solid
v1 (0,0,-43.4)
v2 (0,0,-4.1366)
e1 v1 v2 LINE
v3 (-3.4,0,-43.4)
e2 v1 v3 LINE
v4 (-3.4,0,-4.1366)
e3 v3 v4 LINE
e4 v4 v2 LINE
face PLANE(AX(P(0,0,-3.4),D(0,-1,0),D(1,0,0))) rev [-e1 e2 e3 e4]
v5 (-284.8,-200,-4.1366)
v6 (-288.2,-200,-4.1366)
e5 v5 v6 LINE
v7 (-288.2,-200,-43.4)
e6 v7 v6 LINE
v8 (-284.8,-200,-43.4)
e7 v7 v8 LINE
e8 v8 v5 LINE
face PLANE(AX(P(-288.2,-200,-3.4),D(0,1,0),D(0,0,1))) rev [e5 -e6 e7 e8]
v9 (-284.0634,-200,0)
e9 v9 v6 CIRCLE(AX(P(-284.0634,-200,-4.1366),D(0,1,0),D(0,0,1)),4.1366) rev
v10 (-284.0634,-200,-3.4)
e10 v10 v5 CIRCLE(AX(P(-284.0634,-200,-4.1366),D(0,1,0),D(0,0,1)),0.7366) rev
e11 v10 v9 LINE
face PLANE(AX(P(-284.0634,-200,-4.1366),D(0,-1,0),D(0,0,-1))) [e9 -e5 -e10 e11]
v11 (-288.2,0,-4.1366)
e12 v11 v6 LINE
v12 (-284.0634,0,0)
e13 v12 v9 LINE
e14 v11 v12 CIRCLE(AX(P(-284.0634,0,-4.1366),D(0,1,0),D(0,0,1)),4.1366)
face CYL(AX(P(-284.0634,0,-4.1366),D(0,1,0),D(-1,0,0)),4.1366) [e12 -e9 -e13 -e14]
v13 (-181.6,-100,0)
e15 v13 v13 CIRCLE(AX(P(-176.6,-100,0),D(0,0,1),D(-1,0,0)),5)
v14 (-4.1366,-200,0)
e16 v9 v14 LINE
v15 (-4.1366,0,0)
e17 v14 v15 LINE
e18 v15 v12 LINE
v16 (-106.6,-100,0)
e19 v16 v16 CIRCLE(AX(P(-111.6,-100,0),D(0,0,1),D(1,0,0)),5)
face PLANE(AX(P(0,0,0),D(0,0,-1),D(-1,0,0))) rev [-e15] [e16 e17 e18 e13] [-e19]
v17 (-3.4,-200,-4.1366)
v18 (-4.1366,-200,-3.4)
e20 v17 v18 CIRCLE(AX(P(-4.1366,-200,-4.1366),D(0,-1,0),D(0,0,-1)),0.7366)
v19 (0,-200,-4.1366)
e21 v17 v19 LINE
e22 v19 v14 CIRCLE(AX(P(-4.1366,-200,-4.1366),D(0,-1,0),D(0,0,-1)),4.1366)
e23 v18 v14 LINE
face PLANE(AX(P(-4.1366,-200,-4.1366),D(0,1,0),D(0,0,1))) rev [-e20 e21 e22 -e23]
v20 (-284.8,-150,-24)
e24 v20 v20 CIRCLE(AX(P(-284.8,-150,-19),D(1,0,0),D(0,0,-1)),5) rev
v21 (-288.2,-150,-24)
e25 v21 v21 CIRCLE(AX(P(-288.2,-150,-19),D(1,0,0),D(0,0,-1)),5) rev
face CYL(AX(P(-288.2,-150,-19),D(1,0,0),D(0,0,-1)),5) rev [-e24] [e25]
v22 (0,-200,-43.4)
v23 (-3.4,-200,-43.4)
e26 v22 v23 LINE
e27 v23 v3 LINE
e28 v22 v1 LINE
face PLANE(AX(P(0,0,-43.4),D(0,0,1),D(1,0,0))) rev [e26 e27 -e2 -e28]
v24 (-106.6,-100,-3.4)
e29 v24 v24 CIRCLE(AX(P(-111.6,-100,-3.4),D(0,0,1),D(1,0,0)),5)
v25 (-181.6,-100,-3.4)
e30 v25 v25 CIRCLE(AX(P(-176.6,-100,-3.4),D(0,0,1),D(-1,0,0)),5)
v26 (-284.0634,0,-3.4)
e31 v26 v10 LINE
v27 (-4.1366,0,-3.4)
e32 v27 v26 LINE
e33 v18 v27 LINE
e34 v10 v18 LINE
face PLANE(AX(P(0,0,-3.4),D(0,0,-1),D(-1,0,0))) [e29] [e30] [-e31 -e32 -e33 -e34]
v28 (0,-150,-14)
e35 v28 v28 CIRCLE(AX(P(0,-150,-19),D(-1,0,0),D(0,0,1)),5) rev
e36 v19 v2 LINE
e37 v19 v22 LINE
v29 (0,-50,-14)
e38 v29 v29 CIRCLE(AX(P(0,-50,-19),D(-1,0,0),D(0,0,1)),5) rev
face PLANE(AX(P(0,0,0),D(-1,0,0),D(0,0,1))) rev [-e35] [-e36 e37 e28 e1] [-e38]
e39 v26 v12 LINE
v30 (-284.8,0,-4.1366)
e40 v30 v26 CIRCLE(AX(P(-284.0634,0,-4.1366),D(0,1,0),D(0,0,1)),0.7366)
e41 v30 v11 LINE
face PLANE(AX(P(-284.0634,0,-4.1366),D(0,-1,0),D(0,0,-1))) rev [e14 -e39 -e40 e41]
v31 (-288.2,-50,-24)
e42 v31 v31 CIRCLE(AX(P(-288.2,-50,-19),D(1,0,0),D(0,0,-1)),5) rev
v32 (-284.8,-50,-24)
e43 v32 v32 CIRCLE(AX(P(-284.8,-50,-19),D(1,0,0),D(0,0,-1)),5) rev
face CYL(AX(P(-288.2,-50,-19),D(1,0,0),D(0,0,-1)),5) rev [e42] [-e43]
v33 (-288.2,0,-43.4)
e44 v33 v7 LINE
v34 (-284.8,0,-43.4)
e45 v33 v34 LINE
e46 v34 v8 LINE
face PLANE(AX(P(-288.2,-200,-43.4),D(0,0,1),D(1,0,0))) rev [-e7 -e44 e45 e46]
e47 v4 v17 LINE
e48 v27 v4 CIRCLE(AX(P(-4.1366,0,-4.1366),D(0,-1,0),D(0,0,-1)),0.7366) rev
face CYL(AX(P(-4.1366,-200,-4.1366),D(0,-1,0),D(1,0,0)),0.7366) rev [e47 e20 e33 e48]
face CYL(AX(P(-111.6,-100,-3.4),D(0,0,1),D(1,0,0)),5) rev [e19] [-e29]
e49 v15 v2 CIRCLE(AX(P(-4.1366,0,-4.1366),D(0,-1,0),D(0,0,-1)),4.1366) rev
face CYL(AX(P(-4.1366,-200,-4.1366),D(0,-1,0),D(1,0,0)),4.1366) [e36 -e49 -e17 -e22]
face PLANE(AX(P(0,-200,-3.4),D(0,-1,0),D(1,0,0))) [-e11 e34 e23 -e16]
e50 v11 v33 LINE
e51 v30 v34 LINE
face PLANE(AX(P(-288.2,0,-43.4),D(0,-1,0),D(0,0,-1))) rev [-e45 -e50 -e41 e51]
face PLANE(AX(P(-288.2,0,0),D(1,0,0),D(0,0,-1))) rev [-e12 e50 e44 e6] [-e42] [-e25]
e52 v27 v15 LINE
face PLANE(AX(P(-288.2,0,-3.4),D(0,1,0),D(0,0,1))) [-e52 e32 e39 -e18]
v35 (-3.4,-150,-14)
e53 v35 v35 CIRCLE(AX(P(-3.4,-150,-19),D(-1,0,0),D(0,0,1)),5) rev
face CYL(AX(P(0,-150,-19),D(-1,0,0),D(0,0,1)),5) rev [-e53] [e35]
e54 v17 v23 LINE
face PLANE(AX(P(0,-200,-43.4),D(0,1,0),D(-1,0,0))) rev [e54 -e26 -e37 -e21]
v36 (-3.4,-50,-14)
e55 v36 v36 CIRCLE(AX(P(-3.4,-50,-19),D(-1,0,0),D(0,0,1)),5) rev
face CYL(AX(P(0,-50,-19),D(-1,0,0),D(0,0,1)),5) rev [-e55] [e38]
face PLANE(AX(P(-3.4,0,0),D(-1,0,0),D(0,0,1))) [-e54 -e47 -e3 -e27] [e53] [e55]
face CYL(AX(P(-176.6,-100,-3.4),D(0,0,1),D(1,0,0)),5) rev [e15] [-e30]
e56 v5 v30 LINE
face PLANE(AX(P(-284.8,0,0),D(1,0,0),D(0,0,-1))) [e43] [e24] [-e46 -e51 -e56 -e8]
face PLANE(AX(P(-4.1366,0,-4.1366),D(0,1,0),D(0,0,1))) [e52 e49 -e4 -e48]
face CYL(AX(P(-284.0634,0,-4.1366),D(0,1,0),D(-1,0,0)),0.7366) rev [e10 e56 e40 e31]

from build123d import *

# Parameters (mm, degrees)
SKETCH1_W                    = 288.2
SKETCH1_H                    = 200
SKETCH1_R                    = 5
BASE_FLANGE1_DEPTH           = 3.4
EDGE_FLANGE2_STRIP_W         = 15.0732
EDGE_FLANGE2_STRIP_H         = 3.4
EDGE_FLANGE2_STRIP_CUT_DEPTH = 200
EDGE_FLANGE2_DEPTH           = 200
EDGE_FLANGE2_PROFILE_W       = 200
EDGE_FLANGE2_PROFILE_H       = 39.2634
EDGE_FLANGE2_PROFILE_R       = 5
EDGE_FLANGE2_FLAT_DEPTH      = 3.4
EDGE_FLANGE3_STRIP_W         = 15.0732
EDGE_FLANGE3_STRIP_H         = 3.4
EDGE_FLANGE3_STRIP_CUT_DEPTH = 200
EDGE_FLANGE3_DEPTH           = 200
EDGE_FLANGE3_PROFILE_W       = 200
EDGE_FLANGE3_PROFILE_H       = 39.2634
EDGE_FLANGE3_PROFILE_R       = 5
EDGE_FLANGE3_FLAT_DEPTH      = 3.4


# Sheet-metal steps are written as plain solids
with BuildPart() as part:
    # Sketch1 → Base-Flange1 (new body)
    with BuildSketch(Plane.XY):
        with Locations((-144.1, -100)):
            Rectangle(SKETCH1_W, SKETCH1_H)
        with Locations((-111.6, -100)):
            Circle(SKETCH1_R, mode=Mode.SUBTRACT)
        with Locations(Location((-176.6, -100, 0), (0, 0, 180))):
            Circle(SKETCH1_R, mode=Mode.SUBTRACT)
    extrude(amount=-BASE_FLANGE1_DEPTH)

    # Edge-Flange2 strip (across the edge) → Edge-Flange2 strip cut (cut)
    with BuildSketch(Plane(origin=(0, 0, -3.4), x_dir=(-1, 0, 0), z_dir=(0, -1, 0))):
        with Locations((-3.4, -1.7)):
            Rectangle(EDGE_FLANGE2_STRIP_W, EDGE_FLANGE2_STRIP_H)
    extrude(amount=EDGE_FLANGE2_STRIP_CUT_DEPTH, mode=Mode.SUBTRACT)

    # Edge-Flange2 bend section (across the edge) → Edge-Flange2 (add)
    with BuildSketch(Plane(origin=(0, 0, -3.4), x_dir=(-1, 0, 0), z_dir=(0, -1, 0))):
        with BuildLine():
            Line((0, 0.7366), (3.4, 0.7366))
            ThreePointArc((3.4, 0.7366), (3.615745145, 0.215745145), (4.1366, 0))
            Line((4.1366, 0), (4.1366, -3.4))
            ThreePointArc((4.1366, -3.4), (1.211582089, -2.188417911), (0, 0.7366))
        make_face()
    extrude(amount=EDGE_FLANGE2_DEPTH)

    # Edge-Flange2 profile (on flange) → Edge-Flange2 flat (add)
    with BuildSketch(Plane(origin=(0, 0, -3.4), x_dir=(0, -1, 0), z_dir=(1, 0, 0))):
        with Locations((100, 20.3683)):
            Rectangle(EDGE_FLANGE2_PROFILE_W, EDGE_FLANGE2_PROFILE_H)
        with Locations((150, 15.6)):
            Circle(EDGE_FLANGE2_PROFILE_R, mode=Mode.SUBTRACT)
        with Locations((50, 15.6)):
            Circle(EDGE_FLANGE2_PROFILE_R, mode=Mode.SUBTRACT)
    extrude(amount=-EDGE_FLANGE2_FLAT_DEPTH)

    # Edge-Flange3 strip (across the edge) → Edge-Flange3 strip cut (cut)
    with BuildSketch(Plane(origin=(-288.2, -200, -3.4), x_dir=(1, 0, 0), z_dir=(0, 1, 0))):
        with Locations((-3.4, -1.7)):
            Rectangle(EDGE_FLANGE3_STRIP_W, EDGE_FLANGE3_STRIP_H)
    extrude(amount=EDGE_FLANGE3_STRIP_CUT_DEPTH, mode=Mode.SUBTRACT)

    # Edge-Flange3 bend section (across the edge) → Edge-Flange3 (add)
    with BuildSketch(Plane(origin=(-288.2, -200, -3.4), x_dir=(1, 0, 0), z_dir=(0, 1, 0))):
        with BuildLine():
            Line((0, 0.7366), (3.4, 0.7366))
            ThreePointArc((3.4, 0.7366), (3.615745145, 0.215745145), (4.1366, 0))
            Line((4.1366, 0), (4.1366, -3.4))
            ThreePointArc((4.1366, -3.4), (1.211582089, -2.188417911), (0, 0.7366))
        make_face()
    extrude(amount=EDGE_FLANGE3_DEPTH)

    # Edge-Flange3 profile (on flange) → Edge-Flange3 flat (add)
    with BuildSketch(Plane(origin=(-288.2, 0, -3.4), x_dir=(0, 1, 0), z_dir=(-1, 0, 0))):
        with Locations((-100, 20.3683)):
            Rectangle(EDGE_FLANGE3_PROFILE_W, EDGE_FLANGE3_PROFILE_H)
        with Locations((-50, 15.6)):
            Circle(EDGE_FLANGE3_PROFILE_R, mode=Mode.SUBTRACT)
        with Locations((-150, 15.6)):
            Circle(EDGE_FLANGE3_PROFILE_R, mode=Mode.SUBTRACT)
    extrude(amount=-EDGE_FLANGE3_FLAT_DEPTH)


solid = part.part
